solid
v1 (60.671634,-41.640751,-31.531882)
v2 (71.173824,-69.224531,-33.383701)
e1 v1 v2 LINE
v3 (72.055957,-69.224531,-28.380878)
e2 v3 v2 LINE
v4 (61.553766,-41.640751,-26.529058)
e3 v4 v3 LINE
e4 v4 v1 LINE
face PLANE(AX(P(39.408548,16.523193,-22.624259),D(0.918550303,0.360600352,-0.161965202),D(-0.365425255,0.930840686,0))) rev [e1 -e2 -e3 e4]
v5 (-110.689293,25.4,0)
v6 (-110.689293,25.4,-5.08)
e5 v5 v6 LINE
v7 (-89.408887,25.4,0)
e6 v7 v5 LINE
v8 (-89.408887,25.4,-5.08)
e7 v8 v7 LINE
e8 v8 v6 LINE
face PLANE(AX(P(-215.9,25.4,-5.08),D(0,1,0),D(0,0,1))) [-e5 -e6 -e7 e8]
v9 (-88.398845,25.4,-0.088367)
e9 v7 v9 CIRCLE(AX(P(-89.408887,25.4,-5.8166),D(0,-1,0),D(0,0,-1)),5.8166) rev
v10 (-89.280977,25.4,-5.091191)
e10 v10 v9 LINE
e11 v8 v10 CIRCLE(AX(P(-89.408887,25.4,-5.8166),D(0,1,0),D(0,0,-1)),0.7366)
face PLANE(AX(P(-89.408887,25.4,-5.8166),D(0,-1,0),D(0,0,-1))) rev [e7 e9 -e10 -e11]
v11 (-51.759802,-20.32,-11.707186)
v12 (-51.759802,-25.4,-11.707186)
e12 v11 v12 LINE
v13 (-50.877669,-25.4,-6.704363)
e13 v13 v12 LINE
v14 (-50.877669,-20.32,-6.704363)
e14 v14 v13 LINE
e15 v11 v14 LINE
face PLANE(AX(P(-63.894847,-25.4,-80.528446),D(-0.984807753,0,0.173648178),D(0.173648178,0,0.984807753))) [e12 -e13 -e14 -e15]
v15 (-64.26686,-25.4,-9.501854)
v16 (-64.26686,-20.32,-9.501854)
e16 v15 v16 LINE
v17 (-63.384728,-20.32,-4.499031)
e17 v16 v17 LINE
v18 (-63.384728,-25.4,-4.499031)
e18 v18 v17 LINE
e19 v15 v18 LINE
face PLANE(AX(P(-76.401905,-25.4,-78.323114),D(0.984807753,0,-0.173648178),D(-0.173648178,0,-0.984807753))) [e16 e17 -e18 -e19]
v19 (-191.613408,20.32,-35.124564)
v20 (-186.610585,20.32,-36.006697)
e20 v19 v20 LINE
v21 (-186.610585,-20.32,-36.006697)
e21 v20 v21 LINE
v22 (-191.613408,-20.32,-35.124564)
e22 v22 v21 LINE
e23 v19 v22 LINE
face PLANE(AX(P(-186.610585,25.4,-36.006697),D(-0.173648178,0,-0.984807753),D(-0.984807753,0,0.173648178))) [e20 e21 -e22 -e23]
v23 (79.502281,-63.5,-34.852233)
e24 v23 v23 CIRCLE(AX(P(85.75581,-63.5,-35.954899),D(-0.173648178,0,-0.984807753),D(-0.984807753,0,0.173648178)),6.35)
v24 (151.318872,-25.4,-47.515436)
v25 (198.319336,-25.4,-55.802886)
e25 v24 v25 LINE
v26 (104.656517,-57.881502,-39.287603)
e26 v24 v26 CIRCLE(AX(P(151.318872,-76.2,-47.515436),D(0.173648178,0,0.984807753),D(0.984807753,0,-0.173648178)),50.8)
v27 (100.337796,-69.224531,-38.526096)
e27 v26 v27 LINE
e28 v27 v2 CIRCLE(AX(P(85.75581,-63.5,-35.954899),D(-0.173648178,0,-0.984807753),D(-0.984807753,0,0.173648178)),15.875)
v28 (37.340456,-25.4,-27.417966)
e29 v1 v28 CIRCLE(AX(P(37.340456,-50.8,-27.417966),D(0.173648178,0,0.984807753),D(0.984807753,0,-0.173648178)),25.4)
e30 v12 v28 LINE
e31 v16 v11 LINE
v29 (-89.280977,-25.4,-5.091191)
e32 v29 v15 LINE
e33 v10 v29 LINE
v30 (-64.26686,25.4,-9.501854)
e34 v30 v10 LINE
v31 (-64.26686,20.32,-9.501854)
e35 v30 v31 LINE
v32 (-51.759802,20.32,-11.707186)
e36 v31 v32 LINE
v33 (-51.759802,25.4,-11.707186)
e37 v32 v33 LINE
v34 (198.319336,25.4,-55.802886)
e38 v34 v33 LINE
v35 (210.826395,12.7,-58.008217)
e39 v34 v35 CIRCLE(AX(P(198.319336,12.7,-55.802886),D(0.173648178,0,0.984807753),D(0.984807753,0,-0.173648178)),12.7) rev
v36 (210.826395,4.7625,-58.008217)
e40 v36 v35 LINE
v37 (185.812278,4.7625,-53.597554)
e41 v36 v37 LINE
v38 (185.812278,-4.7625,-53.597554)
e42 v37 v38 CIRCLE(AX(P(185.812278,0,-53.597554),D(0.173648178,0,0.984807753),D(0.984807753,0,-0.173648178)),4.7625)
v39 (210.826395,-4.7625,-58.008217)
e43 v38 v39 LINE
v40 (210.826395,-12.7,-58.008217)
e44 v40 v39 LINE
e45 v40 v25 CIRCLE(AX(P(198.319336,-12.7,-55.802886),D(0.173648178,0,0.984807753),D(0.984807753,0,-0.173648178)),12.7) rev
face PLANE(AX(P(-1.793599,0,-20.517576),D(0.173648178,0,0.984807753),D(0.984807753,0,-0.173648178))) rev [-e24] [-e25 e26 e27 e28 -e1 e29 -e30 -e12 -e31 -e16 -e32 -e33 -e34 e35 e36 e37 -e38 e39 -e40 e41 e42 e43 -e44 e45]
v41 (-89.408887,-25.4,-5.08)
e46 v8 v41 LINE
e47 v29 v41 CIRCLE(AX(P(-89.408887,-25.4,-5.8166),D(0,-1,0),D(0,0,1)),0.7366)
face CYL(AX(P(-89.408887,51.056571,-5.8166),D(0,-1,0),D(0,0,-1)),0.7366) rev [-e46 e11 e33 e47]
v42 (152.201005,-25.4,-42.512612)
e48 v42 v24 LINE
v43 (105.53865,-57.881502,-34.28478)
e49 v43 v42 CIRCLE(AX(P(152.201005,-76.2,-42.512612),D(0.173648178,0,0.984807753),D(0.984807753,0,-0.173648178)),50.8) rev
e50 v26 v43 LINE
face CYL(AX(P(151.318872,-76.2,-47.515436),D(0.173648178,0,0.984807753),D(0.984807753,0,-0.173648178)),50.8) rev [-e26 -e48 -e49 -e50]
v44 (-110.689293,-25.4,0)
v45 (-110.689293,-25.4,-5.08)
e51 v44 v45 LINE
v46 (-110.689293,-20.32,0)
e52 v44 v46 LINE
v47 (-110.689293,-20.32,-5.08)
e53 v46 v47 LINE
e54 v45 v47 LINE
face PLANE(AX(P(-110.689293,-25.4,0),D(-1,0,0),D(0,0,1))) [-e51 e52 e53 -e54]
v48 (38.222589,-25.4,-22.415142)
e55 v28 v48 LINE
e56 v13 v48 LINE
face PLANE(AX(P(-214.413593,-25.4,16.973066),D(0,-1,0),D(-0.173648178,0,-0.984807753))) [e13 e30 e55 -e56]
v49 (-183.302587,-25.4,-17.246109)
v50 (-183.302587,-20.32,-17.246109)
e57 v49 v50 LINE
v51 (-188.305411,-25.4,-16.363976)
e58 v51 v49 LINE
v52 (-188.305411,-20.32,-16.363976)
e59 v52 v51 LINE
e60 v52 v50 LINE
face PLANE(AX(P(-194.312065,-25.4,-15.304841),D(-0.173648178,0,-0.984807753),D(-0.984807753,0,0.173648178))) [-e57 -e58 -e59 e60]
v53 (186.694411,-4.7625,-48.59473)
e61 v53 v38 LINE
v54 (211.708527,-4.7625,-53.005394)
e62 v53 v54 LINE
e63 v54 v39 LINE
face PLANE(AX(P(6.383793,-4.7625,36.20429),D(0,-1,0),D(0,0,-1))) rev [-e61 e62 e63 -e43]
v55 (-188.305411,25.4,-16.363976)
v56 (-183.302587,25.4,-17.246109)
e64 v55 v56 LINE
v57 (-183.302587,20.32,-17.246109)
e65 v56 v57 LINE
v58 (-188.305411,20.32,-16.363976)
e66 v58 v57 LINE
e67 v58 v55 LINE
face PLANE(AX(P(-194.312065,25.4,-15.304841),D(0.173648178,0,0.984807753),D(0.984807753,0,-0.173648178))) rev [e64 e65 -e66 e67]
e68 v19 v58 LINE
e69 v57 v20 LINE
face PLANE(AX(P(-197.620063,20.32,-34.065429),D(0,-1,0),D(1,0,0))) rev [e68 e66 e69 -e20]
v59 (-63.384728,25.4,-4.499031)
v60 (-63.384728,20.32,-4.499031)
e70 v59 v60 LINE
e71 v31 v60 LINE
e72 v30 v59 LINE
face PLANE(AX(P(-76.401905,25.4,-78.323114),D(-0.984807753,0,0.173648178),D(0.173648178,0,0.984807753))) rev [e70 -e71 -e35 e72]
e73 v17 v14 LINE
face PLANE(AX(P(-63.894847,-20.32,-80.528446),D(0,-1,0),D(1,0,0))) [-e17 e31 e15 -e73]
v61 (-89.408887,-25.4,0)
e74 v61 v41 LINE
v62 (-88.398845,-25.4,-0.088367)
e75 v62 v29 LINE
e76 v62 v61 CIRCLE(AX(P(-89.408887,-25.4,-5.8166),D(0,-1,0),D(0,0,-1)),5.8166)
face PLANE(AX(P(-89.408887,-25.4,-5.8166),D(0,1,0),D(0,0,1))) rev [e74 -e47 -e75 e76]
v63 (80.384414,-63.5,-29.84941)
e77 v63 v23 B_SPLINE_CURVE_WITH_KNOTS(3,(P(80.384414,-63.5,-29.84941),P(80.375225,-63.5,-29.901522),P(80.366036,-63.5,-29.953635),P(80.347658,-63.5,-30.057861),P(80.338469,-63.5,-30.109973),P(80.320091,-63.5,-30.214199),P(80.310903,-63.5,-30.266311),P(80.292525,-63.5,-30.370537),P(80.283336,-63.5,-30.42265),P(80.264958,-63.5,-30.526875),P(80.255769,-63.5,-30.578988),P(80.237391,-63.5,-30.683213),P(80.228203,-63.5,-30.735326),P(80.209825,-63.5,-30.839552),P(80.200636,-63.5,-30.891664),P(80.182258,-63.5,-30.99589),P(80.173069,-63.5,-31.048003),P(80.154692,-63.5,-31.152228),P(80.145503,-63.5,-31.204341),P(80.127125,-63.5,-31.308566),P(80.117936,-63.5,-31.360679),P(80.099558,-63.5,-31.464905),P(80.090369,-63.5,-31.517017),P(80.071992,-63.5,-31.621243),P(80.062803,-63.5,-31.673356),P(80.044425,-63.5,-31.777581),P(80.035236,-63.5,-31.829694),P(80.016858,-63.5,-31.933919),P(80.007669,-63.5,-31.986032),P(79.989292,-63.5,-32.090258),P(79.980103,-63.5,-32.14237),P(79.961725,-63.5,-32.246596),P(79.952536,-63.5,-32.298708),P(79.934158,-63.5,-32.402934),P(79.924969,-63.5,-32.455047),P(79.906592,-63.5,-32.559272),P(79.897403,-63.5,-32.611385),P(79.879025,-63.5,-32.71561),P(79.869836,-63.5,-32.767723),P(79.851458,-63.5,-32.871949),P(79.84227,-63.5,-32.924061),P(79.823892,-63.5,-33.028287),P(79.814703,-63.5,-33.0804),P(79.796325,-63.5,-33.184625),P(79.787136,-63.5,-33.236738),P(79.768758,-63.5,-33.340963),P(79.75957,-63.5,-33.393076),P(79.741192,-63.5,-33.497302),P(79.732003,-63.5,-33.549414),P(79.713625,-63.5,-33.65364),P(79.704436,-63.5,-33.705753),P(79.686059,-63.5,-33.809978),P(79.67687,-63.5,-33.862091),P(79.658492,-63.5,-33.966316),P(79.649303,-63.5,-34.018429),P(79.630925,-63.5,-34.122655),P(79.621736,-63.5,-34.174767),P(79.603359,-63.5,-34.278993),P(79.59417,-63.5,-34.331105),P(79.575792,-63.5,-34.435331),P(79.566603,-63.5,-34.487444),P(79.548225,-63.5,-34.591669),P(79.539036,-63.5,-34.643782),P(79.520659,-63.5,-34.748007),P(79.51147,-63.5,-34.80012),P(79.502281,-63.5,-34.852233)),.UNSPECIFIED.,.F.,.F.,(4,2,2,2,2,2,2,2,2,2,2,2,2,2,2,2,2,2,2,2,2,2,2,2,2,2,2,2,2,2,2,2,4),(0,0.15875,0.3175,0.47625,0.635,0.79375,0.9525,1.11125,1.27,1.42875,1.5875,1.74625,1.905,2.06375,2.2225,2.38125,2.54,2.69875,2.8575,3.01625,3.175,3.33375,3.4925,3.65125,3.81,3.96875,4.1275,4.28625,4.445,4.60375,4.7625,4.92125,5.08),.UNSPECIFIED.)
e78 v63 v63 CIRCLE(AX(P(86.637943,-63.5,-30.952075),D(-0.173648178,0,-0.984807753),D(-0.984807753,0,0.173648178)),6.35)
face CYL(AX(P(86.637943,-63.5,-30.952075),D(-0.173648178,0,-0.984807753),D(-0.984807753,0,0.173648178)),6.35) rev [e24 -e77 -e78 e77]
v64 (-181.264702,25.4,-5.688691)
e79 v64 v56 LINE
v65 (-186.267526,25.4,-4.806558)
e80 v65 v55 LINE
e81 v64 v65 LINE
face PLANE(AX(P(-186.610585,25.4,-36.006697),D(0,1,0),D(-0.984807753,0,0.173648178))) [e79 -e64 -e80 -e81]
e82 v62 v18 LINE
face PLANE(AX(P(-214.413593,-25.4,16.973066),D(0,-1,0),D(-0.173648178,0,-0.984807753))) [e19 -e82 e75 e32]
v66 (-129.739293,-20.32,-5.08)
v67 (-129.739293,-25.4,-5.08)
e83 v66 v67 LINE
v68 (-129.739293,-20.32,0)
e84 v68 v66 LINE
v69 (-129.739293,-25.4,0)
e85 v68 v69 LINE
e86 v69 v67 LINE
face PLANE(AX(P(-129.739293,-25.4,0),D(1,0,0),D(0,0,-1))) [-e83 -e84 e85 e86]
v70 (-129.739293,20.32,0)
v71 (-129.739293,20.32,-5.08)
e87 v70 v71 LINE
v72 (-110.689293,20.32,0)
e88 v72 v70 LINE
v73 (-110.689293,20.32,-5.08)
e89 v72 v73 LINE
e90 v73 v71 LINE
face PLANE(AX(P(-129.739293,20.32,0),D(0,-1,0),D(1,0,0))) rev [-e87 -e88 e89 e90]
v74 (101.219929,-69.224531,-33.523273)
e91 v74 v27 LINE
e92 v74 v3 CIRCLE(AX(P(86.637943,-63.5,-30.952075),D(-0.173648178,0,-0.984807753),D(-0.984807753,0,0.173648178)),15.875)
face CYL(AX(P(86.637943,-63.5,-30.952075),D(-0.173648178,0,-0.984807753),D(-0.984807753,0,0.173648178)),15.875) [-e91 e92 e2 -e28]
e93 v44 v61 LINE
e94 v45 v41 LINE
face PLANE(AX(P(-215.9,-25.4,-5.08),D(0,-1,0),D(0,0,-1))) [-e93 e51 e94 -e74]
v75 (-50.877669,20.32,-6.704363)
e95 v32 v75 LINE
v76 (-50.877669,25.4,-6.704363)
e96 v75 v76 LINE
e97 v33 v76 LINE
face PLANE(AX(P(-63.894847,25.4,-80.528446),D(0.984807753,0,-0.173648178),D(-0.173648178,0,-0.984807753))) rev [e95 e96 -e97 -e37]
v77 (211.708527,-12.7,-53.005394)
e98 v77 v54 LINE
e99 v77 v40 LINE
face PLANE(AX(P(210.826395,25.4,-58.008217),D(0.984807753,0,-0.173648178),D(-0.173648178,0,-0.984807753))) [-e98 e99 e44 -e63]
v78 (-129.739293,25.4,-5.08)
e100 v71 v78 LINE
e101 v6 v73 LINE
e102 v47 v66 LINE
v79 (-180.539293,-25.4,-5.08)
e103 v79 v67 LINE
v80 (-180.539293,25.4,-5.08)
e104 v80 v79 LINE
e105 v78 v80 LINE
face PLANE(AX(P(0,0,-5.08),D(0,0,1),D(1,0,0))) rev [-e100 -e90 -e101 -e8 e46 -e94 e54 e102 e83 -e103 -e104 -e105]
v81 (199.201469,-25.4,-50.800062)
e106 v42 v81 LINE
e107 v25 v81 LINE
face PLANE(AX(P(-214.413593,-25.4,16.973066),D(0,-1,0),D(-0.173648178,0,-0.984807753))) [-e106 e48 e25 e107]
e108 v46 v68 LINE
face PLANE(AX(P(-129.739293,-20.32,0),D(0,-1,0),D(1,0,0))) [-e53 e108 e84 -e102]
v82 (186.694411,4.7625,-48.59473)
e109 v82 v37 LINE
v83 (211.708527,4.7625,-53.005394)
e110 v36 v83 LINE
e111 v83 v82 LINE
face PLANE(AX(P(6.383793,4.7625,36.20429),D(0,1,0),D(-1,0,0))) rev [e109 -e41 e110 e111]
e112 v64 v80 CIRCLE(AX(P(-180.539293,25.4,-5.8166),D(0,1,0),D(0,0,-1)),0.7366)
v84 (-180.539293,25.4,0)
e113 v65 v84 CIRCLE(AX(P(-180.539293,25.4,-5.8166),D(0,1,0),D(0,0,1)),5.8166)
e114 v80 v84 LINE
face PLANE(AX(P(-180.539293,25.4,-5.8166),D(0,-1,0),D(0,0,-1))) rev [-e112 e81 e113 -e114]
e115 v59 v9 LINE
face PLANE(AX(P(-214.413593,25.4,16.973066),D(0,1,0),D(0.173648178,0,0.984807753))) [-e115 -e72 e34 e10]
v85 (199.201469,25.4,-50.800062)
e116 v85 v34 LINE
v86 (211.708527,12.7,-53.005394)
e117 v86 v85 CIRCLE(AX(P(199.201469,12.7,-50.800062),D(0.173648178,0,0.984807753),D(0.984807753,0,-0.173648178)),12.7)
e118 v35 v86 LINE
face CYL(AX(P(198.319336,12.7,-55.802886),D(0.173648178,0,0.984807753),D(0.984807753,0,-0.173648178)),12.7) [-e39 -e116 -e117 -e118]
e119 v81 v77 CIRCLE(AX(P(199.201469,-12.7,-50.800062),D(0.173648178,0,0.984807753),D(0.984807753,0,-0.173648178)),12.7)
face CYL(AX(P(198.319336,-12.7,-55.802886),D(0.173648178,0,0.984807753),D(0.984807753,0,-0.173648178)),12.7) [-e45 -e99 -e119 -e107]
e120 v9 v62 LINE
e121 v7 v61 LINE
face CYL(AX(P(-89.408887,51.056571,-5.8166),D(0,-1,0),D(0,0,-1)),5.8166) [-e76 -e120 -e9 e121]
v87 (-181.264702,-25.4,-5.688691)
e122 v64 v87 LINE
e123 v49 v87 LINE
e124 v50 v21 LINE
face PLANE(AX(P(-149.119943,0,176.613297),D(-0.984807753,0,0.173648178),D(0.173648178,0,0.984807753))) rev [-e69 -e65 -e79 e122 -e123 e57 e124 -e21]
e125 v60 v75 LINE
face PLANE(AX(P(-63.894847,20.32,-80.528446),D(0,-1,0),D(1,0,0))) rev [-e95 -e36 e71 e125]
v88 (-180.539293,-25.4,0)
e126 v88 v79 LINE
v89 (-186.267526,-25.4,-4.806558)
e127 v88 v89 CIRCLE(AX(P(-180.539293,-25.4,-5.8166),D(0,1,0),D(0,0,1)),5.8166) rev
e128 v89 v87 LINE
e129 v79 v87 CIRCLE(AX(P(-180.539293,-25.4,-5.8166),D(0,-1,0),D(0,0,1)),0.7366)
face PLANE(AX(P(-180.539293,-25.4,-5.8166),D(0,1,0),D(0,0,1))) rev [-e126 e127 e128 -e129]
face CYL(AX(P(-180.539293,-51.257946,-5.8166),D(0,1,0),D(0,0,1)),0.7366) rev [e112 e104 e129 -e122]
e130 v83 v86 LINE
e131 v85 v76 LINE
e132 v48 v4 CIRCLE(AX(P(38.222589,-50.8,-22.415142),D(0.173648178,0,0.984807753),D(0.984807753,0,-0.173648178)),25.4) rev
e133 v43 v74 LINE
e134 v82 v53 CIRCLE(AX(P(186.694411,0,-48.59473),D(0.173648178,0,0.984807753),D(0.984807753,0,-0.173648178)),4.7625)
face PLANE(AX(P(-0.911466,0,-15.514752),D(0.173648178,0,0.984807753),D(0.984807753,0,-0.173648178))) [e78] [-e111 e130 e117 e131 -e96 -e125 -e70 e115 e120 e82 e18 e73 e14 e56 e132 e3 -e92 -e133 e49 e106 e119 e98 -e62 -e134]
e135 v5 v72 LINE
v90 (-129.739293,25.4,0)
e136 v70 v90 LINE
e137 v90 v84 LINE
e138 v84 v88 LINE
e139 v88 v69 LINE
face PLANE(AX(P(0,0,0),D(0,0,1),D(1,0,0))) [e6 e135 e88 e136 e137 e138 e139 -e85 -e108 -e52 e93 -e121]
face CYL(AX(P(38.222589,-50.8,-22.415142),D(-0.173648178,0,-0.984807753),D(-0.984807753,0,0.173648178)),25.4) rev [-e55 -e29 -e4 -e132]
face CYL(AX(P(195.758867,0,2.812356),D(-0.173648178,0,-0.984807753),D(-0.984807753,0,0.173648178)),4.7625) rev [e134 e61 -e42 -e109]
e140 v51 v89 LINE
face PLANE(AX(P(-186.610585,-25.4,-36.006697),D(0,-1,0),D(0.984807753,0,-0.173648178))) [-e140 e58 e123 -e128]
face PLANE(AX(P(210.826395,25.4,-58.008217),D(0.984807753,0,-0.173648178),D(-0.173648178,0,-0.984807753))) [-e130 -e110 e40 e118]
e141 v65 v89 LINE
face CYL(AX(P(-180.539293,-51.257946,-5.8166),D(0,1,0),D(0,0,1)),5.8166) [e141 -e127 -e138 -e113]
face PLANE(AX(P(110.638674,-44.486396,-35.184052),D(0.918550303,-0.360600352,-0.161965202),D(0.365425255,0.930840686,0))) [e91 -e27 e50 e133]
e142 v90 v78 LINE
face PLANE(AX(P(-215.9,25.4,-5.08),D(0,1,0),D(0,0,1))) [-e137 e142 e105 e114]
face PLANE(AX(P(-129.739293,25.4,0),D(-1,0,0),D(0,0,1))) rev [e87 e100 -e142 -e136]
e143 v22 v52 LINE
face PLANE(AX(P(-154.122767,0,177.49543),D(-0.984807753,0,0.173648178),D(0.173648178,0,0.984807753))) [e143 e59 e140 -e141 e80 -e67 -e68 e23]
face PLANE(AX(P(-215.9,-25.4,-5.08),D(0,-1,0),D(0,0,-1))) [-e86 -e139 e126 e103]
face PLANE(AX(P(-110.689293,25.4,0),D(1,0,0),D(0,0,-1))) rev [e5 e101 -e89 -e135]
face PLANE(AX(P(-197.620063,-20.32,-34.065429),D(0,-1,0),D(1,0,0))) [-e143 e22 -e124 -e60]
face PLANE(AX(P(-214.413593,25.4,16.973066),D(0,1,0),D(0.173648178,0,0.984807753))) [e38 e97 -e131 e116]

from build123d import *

# Parameters (mm, degrees)
SKETCH1_W               = 431.8
SKETCH1_H               = 50.8
BASE_FLANGE1_DEPTH      = 5.08
SKETCHED_START          = -25.4
SKETCHED_BEND1_DEPTH    = 50.8
SKETCHED_BEND1_2_DEPTH  = 50.8
SKETCHED_BEND2_DEPTH    = 50.8
SKETCHED_BEND2_2_DEPTH  = 50.8
SKETCH9_W               = 19.05
SKETCH9_H               = 5.08
CUT_EXTRUDE1_DEPTH      = 220.697648588
SKETCH10_W              = 19.05
SKETCH10_H              = 5.08
CUT_EXTRUDE2_DEPTH      = 398.423928706
SKETCH11_W              = 12.7
SKETCH11_H              = 5.08
CUT_EXTRUDE3_DEPTH      = 221.091320007
FILLET1_R               = 12.7
CUT_EXTRUDE4_DEPTH      = 221.036222152
CUT_EXTRUDE4_DEPTH_BACK = 221.036222152
SKETCH12_R              = 4.7625
SKETCH14_R              = 6.35
BOSS_EXTRUDE1_DEPTH     = 5.08
FILLET2_R               = 50.8
FILLET3_R               = 25.4


# Read off the part's stored shape, not the designer's step: Sketched Bend1, Sketched Bend2
# Sheet-metal steps are written as plain solids
with BuildPart() as part:
    # Sketch1 → Base-Flange1 (new body)
    with BuildSketch(Plane.XY):
        Rectangle(SKETCH1_W, SKETCH1_H)
    extrude(amount=-BASE_FLANGE1_DEPTH)

    # Sketched Bend1 outline → Sketched Bend1 (cut)
    with BuildSketch(Plane(origin=(0, 0, 0), x_dir=(1, 0, 0), z_dir=(0, 1, 0)).offset(SKETCHED_START)):
        with BuildLine():
            Line((-186.267525861, 4.80655801), (-186.315741061, 5.08))
            Line((-186.315741061, 5.08), (-215.9, 5.08))
            Line((-215.9, 5.08), (-215.9, 0))
            Line((-215.9, 0), (-180.539293085, 0))
            ThreePointArc((-180.539293085, 0), (-184.278131496, 1.360825892), (-186.267525861, 4.80655801))
        make_face()
    extrude(amount=SKETCHED_BEND1_DEPTH, mode=Mode.SUBTRACT)

    # Sketched Bend1 2 outline → Sketched Bend1 2 (add)
    with BuildSketch(Plane(origin=(0, 0, 0), x_dir=(1, 0, 0), z_dir=(0, 1, 0)).offset(SKETCHED_START)):
        with BuildLine():
            Line((-181.264702476, 5.688690752), (-186.61058496, 36.006696892))
            Line((-186.61058496, 36.006696892), (-191.613408345, 35.124564149))
            Line((-191.613408345, 35.124564149), (-186.315741061, 5.08))
            Line((-186.315741061, 5.08), (-180.539293085, 5.08))
            ThreePointArc((-180.539293085, 5.08), (-181.012770439, 5.252331663), (-181.264702476, 5.688690752))
        make_face()
    extrude(amount=SKETCHED_BEND1_2_DEPTH)

    # Sketched Bend2 outline → Sketched Bend2 (cut)
    with BuildSketch(Plane(origin=(0, 0, 0), x_dir=(1, 0, 0), z_dir=(0, 1, 0)).offset(SKETCHED_START)):
        with BuildLine():
            Line((215.9, 5.08), (-60.089888357, 5.08))
            Line((-60.089888357, 5.08), (-88.39884457, 0.088367224))
            ThreePointArc((-88.39884457, 0.088367224), (-88.901936467, 0.022133919), (-89.40888656, 0))
            Line((-89.40888656, 0), (215.9, 0))
            Line((215.9, 0), (215.9, 5.08))
        make_face()
    extrude(amount=SKETCHED_BEND2_DEPTH, mode=Mode.SUBTRACT)

    # Sketched Bend2 2 outline → Sketched Bend2 2 (add)
    with BuildSketch(Plane(origin=(0, 0, 0), x_dir=(1, 0, 0), z_dir=(0, 1, 0)).offset(SKETCHED_START)):
        with BuildLine():
            Line((210.826394713, 58.008217407), (-89.280977313, 5.091190609))
            ThreePointArc((-89.280977313, 5.091190609), (-89.34468764, 5.082802985), (-89.40888656, 5.08))
            Line((-89.40888656, 5.08), (-60.089888357, 5.08))
            Line((-60.089888357, 5.08), (211.708527455, 53.005394021))
            Line((211.708527455, 53.005394021), (210.826394713, 58.008217407))
        make_face()
    extrude(amount=SKETCHED_BEND2_2_DEPTH)

    # Sketch9 → Cut-Extrude1 (cut, through all)
    with BuildSketch(Plane(origin=(0, 0, -5.08), x_dir=(-1, 0, 0), z_dir=(0, 0, -1))):
        with Locations((120.214293085, 22.86)):
            Rectangle(SKETCH9_W, SKETCH9_H)
    cut_extrude1 = extrude(amount=-CUT_EXTRUDE1_DEPTH, mode=Mode.SUBTRACT)

    # Sketch10 → Cut-Extrude2 (cut, through all)
    with BuildSketch(Plane(origin=(-174.826079488, 0, 30.826554745), x_dir=(-0.17364817766692736, 0, -0.9848077530122086), z_dir=(0.9848077530122086, 0, -0.17364817766692736))):
        with Locations((58.339262271, 22.86)):
            Rectangle(SKETCH10_W, SKETCH10_H)
    cut_extrude2 = extrude(amount=-CUT_EXTRUDE2_DEPTH, mode=Mode.SUBTRACT)

    # Sketch11 → Cut-Extrude3 (cut, through all)
    with BuildSketch(Plane(origin=(-2.680663006, 0, -15.202795371), x_dir=(0.9848077530122081, 0, -0.17364817766693072), z_dir=(0.17364817766693072, 0, 0.9848077530122081))):
        with Locations((-55.290522683, 22.86)):
            Rectangle(SKETCH11_W, SKETCH11_H)
    cut_extrude3 = extrude(amount=-CUT_EXTRUDE3_DEPTH, mode=Mode.SUBTRACT)

    # Mirror1: Cut-Extrude1, Cut-Extrude2, Cut-Extrude3 across plane
    add(cut_extrude1.mirror(Plane.ZX), mode=Mode.SUBTRACT)
    add(cut_extrude2.mirror(Plane.ZX), mode=Mode.SUBTRACT)
    add(cut_extrude3.mirror(Plane.ZX), mode=Mode.SUBTRACT)

    # Fillet1
    fillet1_edges = [part.edges().sort_by_distance(p)[0] for p in [
        (211.267461084, 25.4, -55.506805714),
        (211.267461084, -25.4, -55.506805714),
    ]]
    fillet(fillet1_edges, radius=FILLET1_R)

    # Sketch12 → Cut-Extrude4 (cut, two sides: drawn at the far end of the back side and taken through both)
    with BuildSketch(Plane(origin=(-3.562795749, 0, -20.205618756), x_dir=(-0.9848077530122081, 0, 0.17364817766693072), z_dir=(-0.17364817766693072, 0, -0.9848077530122081)).offset(-CUT_EXTRUDE4_DEPTH_BACK)):
        with BuildLine():
            ThreePointArc((-192.296489295, -4.7625), (-197.058989295, 0), (-192.296489295, 4.7625))
            Line((-192.296489295, 4.7625), (-217.696489295, 4.7625))
            Line((-217.696489295, 4.7625), (-217.696489295, -4.7625))
            Line((-217.696489295, -4.7625), (-192.296489295, -4.7625))
        make_face()
        with Locations((-192.296489295, 0)):
            Circle(SKETCH12_R)
    extrude(amount=CUT_EXTRUDE4_DEPTH + CUT_EXTRUDE4_DEPTH_BACK, mode=Mode.SUBTRACT)

    # Sketch14 → Boss-Extrude1 (add)
    with BuildSketch(Plane(origin=(-3.562795749, 0, -20.205618756), x_dir=(-0.9848077530122081, 0, 0.17364817766693072), z_dir=(-0.17364817766693072, 0, -0.9848077530122081))):
        with BuildLine():
            Line((-75.889552591, -69.224530587), (-58.946489295, -25.4))
            Line((-58.946489295, -25.4), (-122.446489295, -25.4))
            Line((-122.446489295, -25.4), (-105.503425999, -69.224530587))
            ThreePointArc((-105.503425999, -69.224530587), (-90.696489295, -79.375), (-75.889552591, -69.224530587))
        make_face()
        with Locations((-90.696489295, -63.5)):
            Circle(SKETCH14_R, mode=Mode.SUBTRACT)
    extrude(amount=-BOSS_EXTRUDE1_DEPTH)

    # Fillet2
    fillet2_edges = [part.edges().sort_by_distance(p)[0] for p in [
        (117.46452261, -25.4, -38.966816791),
    ]]
    fillet(fillet2_edges, radius=FILLET2_R)

    # Fillet3
    # the kernel refuses this fillet: 25.4 mm, written as the material it adds along each edge
    with BuildSketch(Plane(origin=(54.488163922, -25.4, -30.441569202), x_dir=(0.35512202231381235, -0.9327204223089547, -0.06261759397767878), z_dir=(0.17364817766693072, 0, 0.9848077530122081))) as fillet3_piece_1:
        with BuildLine():
            CenterArc((FILLET3_R * 0.685521226707, -FILLET3_R), FILLET3_R, 90, 68.862929738)
            Line((-FILLET3_R * 0.247199195602, -FILLET3_R * 0.639399648076), (0, 0))
            Line((0, 0), (FILLET3_R * 0.685521226707, 0))
        make_face()
    extrude(amount=5.08)


solid = part.part
